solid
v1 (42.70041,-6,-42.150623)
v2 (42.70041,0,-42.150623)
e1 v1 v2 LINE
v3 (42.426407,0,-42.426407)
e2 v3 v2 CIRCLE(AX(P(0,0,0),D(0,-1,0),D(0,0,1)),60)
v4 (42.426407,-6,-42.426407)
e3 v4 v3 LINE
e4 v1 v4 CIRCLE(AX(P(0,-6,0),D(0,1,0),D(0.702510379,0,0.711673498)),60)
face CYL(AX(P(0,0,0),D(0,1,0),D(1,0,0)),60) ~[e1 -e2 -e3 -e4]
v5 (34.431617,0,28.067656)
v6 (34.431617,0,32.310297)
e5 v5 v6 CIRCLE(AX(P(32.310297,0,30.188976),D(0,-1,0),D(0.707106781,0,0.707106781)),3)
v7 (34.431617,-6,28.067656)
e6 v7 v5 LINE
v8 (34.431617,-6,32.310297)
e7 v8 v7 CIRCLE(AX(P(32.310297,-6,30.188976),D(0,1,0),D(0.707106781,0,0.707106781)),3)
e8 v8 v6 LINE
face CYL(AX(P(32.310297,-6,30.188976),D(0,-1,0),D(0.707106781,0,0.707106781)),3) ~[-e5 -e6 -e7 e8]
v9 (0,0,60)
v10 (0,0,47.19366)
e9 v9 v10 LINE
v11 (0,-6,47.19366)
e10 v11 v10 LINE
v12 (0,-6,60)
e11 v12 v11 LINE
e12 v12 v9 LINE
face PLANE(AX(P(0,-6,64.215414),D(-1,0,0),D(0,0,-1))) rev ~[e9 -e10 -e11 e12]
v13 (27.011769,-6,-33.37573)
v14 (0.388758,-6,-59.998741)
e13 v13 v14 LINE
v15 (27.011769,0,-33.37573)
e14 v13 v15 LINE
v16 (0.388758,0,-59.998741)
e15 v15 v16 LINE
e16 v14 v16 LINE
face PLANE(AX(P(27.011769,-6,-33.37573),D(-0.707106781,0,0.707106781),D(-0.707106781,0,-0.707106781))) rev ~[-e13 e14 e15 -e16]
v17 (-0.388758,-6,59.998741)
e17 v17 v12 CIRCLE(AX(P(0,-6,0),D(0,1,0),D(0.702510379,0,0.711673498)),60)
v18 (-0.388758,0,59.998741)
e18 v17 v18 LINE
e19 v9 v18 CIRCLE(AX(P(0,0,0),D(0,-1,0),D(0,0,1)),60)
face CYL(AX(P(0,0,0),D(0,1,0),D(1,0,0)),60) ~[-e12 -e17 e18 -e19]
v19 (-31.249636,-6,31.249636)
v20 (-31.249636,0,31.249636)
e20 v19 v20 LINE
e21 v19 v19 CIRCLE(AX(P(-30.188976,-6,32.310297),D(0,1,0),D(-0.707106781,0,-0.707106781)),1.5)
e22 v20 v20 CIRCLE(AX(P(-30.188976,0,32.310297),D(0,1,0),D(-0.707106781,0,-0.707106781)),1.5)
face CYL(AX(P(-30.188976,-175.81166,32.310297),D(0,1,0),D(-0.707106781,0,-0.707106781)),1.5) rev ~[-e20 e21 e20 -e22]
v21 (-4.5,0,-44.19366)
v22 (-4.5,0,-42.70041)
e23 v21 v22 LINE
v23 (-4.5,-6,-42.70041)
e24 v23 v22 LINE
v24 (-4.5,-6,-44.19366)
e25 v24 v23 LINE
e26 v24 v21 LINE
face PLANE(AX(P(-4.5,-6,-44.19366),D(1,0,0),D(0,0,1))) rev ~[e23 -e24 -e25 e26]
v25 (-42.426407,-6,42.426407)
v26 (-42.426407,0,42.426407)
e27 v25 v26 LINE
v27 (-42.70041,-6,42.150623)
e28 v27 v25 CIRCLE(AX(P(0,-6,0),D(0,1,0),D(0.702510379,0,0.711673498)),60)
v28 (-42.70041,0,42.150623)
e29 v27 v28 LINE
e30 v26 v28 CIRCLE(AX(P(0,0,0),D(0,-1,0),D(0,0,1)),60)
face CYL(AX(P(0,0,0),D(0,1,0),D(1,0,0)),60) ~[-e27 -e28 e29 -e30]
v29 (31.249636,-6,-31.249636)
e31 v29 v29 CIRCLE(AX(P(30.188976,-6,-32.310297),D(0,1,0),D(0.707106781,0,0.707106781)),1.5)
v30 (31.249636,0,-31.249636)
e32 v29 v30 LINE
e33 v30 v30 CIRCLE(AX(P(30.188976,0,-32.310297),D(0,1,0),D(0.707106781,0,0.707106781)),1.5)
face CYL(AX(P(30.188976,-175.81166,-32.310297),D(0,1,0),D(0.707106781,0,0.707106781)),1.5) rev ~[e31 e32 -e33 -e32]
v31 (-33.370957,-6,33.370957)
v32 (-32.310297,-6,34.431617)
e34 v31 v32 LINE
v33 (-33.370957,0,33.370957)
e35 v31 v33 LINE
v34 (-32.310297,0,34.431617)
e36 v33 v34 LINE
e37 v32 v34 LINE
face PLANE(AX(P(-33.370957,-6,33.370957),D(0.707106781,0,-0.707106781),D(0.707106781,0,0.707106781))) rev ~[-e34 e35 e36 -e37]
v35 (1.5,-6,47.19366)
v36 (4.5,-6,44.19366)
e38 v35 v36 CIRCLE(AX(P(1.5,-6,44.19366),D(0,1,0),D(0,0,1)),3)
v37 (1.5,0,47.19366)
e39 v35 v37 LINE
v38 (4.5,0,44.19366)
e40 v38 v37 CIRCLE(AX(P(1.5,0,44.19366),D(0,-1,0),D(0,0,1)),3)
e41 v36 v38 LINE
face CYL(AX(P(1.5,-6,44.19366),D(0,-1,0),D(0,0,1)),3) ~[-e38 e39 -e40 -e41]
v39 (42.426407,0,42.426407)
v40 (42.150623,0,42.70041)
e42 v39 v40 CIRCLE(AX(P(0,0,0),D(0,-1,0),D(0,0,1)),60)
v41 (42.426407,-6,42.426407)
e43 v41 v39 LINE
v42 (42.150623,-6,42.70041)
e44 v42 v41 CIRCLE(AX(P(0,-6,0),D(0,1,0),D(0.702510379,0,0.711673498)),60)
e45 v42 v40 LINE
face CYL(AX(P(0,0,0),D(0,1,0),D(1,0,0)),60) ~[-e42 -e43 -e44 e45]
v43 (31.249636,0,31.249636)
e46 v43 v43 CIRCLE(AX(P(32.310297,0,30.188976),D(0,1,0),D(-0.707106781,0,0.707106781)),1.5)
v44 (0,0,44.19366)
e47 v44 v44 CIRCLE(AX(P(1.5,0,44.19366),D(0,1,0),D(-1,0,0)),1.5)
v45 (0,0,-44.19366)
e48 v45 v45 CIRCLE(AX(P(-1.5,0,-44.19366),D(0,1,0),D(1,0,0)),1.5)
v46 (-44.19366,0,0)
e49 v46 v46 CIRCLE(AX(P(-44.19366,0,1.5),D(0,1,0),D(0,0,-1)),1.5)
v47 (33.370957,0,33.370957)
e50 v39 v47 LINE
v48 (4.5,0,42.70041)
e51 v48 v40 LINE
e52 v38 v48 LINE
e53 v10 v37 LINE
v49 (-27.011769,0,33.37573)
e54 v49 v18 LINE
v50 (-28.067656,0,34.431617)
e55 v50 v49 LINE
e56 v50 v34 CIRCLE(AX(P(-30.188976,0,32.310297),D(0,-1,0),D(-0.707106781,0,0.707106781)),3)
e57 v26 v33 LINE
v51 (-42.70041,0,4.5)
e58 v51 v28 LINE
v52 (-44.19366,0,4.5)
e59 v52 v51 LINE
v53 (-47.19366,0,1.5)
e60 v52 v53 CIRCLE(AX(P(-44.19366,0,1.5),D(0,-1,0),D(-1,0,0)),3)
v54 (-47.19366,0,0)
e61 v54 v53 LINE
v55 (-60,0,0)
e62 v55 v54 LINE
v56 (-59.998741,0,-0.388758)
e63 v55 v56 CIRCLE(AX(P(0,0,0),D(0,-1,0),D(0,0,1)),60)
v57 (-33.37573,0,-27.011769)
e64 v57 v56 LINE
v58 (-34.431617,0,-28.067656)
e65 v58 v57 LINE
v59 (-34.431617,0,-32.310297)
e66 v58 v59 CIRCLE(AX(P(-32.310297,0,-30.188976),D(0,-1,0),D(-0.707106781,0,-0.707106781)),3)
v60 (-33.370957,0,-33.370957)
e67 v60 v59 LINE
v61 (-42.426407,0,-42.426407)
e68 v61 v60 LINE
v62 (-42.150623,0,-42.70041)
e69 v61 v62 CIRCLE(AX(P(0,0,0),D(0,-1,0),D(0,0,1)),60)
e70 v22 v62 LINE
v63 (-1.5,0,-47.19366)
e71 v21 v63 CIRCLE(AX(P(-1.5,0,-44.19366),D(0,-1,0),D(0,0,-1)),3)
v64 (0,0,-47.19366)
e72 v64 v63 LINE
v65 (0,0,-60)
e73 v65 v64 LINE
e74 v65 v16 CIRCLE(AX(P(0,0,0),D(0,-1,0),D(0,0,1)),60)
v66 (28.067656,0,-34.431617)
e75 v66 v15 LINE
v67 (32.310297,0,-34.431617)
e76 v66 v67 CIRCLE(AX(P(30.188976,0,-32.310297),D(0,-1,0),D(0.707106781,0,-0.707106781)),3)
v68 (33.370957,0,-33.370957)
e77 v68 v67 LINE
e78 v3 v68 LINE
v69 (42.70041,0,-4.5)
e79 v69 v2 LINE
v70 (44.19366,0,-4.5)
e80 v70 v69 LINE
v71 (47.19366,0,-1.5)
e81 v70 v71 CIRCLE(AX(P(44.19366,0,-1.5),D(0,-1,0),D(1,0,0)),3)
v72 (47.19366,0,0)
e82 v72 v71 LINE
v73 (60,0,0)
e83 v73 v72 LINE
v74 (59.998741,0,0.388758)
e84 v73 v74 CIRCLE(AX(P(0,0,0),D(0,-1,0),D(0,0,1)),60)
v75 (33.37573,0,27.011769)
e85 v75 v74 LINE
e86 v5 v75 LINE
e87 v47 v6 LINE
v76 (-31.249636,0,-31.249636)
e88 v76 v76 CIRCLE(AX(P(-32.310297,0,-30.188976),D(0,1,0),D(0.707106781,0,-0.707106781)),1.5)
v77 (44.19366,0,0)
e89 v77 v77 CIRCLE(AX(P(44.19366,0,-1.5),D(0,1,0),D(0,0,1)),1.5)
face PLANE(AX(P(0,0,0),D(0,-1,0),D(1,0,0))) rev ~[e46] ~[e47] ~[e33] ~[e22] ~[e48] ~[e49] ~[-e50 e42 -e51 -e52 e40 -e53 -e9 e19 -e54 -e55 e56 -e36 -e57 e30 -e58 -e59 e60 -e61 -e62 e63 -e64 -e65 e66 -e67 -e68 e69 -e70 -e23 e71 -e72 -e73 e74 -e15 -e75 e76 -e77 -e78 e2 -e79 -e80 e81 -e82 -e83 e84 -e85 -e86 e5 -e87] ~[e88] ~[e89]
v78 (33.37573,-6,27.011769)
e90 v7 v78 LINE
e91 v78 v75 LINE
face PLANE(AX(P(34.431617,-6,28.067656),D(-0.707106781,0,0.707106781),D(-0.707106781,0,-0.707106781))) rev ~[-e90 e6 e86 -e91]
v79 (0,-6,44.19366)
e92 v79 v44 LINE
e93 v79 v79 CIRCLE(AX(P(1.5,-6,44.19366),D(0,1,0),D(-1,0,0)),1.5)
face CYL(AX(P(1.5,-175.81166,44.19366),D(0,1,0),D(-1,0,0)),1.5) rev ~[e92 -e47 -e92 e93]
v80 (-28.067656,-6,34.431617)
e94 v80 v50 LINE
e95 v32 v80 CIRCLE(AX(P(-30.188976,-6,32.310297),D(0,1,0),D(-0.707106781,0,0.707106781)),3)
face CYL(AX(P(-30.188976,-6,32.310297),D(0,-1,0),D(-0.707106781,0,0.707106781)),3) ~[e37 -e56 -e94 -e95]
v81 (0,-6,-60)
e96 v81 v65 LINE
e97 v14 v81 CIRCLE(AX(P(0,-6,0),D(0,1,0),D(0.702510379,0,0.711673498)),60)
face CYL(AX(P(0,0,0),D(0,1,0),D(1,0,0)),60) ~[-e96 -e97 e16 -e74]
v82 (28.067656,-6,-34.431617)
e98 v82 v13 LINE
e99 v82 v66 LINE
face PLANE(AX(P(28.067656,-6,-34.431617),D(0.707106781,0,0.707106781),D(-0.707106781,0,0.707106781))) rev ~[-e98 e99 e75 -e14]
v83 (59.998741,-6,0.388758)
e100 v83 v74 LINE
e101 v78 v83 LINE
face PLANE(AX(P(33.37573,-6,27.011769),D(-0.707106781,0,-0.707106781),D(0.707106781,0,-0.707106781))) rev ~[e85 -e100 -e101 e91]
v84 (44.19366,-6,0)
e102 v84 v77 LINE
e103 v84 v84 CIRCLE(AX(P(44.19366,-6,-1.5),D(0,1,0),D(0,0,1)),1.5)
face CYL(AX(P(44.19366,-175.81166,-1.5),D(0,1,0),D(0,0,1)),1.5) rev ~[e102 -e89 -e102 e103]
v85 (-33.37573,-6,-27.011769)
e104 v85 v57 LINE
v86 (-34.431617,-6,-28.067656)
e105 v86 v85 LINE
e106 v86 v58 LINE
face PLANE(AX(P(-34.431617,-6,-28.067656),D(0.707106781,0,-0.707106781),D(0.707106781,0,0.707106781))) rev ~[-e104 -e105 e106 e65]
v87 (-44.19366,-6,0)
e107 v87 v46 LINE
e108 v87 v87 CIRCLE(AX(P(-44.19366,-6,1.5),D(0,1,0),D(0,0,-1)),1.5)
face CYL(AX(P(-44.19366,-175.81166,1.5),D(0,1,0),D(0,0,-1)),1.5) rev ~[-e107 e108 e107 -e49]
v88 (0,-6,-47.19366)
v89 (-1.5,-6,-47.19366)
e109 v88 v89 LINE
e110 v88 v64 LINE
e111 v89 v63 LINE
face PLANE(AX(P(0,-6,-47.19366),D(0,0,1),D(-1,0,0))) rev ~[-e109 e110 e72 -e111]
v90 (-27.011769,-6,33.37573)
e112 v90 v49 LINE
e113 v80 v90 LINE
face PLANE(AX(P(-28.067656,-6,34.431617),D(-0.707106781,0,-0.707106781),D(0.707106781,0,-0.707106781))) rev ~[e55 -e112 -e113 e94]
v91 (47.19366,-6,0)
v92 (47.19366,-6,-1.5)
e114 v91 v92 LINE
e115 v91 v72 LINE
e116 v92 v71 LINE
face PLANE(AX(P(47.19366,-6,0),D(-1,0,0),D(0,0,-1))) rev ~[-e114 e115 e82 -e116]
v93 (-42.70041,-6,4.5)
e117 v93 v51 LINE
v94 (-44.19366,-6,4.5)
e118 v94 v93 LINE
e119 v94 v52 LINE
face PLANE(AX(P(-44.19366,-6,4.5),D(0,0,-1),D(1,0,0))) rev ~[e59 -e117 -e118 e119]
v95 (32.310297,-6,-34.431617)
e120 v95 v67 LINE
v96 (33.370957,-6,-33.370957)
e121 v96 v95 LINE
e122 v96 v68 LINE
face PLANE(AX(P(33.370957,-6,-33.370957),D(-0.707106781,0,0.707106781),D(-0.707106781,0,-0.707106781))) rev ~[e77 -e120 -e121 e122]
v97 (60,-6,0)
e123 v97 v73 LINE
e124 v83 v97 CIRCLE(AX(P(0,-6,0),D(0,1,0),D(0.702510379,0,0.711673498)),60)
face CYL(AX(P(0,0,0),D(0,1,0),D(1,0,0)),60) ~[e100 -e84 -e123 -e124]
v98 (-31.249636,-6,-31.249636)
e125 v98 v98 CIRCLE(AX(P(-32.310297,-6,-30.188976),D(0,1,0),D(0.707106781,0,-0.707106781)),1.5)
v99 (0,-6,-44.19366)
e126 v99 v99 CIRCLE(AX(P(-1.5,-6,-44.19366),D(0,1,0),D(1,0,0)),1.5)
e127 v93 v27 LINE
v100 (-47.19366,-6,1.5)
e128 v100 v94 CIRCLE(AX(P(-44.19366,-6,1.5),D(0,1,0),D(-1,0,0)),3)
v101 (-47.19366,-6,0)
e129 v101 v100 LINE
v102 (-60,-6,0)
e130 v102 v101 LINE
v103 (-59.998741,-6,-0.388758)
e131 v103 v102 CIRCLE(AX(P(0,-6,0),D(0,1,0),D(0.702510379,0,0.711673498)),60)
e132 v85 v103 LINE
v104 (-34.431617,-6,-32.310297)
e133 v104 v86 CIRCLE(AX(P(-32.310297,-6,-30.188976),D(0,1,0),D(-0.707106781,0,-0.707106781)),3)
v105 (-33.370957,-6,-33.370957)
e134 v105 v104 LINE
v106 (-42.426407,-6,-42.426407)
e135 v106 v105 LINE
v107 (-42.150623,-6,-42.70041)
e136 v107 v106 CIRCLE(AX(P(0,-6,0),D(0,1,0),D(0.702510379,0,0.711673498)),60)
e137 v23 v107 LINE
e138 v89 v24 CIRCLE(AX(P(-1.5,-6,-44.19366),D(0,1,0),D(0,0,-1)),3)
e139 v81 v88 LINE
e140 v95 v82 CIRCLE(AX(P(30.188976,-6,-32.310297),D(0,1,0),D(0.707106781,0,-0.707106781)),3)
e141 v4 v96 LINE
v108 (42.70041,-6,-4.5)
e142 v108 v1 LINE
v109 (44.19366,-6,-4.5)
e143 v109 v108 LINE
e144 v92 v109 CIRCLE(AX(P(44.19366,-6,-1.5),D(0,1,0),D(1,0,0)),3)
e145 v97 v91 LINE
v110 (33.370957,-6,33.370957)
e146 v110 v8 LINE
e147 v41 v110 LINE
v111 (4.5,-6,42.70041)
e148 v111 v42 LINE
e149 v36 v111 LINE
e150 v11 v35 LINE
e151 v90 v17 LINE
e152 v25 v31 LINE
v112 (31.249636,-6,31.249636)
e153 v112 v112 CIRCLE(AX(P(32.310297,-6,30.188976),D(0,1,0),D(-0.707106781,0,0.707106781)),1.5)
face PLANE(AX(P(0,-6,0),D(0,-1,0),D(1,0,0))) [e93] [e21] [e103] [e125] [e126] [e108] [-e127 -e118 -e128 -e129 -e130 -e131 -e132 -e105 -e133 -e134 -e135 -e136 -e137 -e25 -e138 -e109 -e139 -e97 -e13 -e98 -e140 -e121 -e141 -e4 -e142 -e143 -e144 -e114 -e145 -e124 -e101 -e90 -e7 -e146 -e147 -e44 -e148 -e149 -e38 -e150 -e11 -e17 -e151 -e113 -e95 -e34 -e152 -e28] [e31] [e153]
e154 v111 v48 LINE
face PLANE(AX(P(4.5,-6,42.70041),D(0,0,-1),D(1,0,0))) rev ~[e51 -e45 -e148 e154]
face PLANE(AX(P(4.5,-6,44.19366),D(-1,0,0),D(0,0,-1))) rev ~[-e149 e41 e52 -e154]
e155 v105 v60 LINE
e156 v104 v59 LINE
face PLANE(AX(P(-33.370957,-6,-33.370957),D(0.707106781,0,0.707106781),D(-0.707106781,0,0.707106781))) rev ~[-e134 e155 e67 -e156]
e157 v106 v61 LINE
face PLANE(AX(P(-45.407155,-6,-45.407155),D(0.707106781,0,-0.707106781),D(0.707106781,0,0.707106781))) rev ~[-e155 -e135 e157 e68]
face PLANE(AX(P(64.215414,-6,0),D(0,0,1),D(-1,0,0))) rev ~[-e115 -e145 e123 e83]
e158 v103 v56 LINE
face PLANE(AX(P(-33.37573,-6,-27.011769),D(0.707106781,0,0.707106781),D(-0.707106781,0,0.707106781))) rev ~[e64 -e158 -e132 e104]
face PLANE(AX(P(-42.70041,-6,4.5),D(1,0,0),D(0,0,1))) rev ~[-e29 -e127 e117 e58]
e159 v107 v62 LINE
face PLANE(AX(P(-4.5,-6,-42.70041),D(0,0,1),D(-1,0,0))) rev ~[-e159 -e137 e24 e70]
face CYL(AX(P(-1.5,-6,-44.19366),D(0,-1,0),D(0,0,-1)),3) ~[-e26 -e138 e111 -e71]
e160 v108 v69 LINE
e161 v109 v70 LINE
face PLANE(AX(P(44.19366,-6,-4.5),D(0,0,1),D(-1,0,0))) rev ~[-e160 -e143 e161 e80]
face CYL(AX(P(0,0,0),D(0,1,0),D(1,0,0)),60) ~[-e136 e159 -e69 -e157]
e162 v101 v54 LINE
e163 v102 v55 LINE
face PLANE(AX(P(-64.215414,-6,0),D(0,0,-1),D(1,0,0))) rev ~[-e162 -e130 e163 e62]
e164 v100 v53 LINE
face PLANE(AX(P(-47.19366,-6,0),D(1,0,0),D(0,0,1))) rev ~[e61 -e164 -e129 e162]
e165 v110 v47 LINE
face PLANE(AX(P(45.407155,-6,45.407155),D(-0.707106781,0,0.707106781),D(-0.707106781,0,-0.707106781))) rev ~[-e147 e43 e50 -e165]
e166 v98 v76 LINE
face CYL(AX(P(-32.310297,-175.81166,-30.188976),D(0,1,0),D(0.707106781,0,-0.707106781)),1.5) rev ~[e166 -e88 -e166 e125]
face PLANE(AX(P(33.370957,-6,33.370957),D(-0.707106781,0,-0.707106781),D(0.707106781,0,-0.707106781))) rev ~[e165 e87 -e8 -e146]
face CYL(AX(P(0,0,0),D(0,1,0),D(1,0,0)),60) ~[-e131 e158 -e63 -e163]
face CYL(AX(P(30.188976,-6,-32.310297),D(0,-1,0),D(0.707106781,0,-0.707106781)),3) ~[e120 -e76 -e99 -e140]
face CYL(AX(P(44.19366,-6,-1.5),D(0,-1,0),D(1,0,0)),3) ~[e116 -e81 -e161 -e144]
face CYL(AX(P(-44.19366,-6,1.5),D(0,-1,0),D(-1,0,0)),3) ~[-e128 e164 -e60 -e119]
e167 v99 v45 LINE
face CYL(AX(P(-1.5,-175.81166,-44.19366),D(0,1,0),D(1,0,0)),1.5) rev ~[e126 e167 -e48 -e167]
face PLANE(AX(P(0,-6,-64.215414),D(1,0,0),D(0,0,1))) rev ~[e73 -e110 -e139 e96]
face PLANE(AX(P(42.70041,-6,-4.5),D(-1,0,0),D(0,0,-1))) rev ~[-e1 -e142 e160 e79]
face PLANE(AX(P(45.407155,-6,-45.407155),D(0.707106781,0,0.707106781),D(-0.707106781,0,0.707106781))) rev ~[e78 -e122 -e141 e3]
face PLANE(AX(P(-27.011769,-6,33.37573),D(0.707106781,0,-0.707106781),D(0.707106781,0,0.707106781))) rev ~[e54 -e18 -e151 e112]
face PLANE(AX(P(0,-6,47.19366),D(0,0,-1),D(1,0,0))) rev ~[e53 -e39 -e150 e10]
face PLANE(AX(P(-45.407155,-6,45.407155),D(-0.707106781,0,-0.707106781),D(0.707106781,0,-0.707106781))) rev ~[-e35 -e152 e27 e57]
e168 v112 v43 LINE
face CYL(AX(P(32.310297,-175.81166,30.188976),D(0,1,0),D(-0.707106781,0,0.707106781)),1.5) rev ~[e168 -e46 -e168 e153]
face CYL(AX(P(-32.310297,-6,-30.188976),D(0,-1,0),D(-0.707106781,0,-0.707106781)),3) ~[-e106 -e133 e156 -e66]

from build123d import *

# Parameters (mm, degrees)
F0_R            = 60
F2_DEPTH        = 6
F4_D            = 3
F4_COPIES_COUNT = 8
F6_DEPTH        = 25
F6_COPIES_COUNT = 8


# Not quite as in the source:
# - a pattern or mirror of a feature is missing from the dataset's text; its kind, count and spacing are read off the source's solid


with BuildPart() as f2:
    # F0 (on Front) → F2 (new body)
    with BuildSketch(Plane.XZ):
        Circle(F0_R)
    extrude(amount=F2_DEPTH)

    # F4 (through all)
    with Locations(Plane.XZ.offset(6)):
        with Locations((1.5, 44.1936596632)):
            f4 = Hole(F4_D / 2)

    # F4_copies: F4 ×8 about axis
    f4_copies_axis = Axis((0, 0, 0), (0, 1, 0))
    for i in range(1, F4_COPIES_COUNT):
        add(f4.rotate(f4_copies_axis, i * 360 / F4_COPIES_COUNT), mode=Mode.SUBTRACT)

    # F5 (on face) → F6 (cut)
    with BuildSketch(Plane.XZ.offset(6)):
        with BuildLine():
            Line((4.5, 44.1936596632), (4.5, 42.7004098892))
            Line((4.5, 42.7004098892), (42.1506227154, 42.7004098892))
            ThreePointArc((42.1506227154, 42.7004098892), (22.7813016161, 55.5068671128), (0, 60))
            Line((0, 60), (0, 47.1936596632))
            Line((0, 47.1936596632), (1.5, 47.1936596632))
            ThreePointArc((1.5, 47.1936596632), (3.6213203436, 46.3149800068), (4.5, 44.1936596632))
        make_face()
        with BuildLine():
            ThreePointArc((0, 60), (22.7813016161, 55.5068671128), (42.1506227154, 42.7004098892))
            Line((42.1506227154, 42.7004098892), (58.9860603213, 42.7004098892))
            Line((58.9860603213, 42.7004098892), (58.9860603213, 64.2154142261))
            Line((58.9860603213, 64.2154142261), (0, 64.2154142261))
            Line((0, 64.2154142261), (0, 60))
        make_face()
    f6 = extrude(amount=-F6_DEPTH, mode=Mode.SUBTRACT)

    # F6_copies: F6 ×8 about axis
    f6_copies_axis = Axis((0, 0, 0), (0, 1, 0))
    for i in range(1, F6_COPIES_COUNT):
        add(f6.rotate(f6_copies_axis, i * 360 / F6_COPIES_COUNT), mode=Mode.SUBTRACT)


solid = f2.part
